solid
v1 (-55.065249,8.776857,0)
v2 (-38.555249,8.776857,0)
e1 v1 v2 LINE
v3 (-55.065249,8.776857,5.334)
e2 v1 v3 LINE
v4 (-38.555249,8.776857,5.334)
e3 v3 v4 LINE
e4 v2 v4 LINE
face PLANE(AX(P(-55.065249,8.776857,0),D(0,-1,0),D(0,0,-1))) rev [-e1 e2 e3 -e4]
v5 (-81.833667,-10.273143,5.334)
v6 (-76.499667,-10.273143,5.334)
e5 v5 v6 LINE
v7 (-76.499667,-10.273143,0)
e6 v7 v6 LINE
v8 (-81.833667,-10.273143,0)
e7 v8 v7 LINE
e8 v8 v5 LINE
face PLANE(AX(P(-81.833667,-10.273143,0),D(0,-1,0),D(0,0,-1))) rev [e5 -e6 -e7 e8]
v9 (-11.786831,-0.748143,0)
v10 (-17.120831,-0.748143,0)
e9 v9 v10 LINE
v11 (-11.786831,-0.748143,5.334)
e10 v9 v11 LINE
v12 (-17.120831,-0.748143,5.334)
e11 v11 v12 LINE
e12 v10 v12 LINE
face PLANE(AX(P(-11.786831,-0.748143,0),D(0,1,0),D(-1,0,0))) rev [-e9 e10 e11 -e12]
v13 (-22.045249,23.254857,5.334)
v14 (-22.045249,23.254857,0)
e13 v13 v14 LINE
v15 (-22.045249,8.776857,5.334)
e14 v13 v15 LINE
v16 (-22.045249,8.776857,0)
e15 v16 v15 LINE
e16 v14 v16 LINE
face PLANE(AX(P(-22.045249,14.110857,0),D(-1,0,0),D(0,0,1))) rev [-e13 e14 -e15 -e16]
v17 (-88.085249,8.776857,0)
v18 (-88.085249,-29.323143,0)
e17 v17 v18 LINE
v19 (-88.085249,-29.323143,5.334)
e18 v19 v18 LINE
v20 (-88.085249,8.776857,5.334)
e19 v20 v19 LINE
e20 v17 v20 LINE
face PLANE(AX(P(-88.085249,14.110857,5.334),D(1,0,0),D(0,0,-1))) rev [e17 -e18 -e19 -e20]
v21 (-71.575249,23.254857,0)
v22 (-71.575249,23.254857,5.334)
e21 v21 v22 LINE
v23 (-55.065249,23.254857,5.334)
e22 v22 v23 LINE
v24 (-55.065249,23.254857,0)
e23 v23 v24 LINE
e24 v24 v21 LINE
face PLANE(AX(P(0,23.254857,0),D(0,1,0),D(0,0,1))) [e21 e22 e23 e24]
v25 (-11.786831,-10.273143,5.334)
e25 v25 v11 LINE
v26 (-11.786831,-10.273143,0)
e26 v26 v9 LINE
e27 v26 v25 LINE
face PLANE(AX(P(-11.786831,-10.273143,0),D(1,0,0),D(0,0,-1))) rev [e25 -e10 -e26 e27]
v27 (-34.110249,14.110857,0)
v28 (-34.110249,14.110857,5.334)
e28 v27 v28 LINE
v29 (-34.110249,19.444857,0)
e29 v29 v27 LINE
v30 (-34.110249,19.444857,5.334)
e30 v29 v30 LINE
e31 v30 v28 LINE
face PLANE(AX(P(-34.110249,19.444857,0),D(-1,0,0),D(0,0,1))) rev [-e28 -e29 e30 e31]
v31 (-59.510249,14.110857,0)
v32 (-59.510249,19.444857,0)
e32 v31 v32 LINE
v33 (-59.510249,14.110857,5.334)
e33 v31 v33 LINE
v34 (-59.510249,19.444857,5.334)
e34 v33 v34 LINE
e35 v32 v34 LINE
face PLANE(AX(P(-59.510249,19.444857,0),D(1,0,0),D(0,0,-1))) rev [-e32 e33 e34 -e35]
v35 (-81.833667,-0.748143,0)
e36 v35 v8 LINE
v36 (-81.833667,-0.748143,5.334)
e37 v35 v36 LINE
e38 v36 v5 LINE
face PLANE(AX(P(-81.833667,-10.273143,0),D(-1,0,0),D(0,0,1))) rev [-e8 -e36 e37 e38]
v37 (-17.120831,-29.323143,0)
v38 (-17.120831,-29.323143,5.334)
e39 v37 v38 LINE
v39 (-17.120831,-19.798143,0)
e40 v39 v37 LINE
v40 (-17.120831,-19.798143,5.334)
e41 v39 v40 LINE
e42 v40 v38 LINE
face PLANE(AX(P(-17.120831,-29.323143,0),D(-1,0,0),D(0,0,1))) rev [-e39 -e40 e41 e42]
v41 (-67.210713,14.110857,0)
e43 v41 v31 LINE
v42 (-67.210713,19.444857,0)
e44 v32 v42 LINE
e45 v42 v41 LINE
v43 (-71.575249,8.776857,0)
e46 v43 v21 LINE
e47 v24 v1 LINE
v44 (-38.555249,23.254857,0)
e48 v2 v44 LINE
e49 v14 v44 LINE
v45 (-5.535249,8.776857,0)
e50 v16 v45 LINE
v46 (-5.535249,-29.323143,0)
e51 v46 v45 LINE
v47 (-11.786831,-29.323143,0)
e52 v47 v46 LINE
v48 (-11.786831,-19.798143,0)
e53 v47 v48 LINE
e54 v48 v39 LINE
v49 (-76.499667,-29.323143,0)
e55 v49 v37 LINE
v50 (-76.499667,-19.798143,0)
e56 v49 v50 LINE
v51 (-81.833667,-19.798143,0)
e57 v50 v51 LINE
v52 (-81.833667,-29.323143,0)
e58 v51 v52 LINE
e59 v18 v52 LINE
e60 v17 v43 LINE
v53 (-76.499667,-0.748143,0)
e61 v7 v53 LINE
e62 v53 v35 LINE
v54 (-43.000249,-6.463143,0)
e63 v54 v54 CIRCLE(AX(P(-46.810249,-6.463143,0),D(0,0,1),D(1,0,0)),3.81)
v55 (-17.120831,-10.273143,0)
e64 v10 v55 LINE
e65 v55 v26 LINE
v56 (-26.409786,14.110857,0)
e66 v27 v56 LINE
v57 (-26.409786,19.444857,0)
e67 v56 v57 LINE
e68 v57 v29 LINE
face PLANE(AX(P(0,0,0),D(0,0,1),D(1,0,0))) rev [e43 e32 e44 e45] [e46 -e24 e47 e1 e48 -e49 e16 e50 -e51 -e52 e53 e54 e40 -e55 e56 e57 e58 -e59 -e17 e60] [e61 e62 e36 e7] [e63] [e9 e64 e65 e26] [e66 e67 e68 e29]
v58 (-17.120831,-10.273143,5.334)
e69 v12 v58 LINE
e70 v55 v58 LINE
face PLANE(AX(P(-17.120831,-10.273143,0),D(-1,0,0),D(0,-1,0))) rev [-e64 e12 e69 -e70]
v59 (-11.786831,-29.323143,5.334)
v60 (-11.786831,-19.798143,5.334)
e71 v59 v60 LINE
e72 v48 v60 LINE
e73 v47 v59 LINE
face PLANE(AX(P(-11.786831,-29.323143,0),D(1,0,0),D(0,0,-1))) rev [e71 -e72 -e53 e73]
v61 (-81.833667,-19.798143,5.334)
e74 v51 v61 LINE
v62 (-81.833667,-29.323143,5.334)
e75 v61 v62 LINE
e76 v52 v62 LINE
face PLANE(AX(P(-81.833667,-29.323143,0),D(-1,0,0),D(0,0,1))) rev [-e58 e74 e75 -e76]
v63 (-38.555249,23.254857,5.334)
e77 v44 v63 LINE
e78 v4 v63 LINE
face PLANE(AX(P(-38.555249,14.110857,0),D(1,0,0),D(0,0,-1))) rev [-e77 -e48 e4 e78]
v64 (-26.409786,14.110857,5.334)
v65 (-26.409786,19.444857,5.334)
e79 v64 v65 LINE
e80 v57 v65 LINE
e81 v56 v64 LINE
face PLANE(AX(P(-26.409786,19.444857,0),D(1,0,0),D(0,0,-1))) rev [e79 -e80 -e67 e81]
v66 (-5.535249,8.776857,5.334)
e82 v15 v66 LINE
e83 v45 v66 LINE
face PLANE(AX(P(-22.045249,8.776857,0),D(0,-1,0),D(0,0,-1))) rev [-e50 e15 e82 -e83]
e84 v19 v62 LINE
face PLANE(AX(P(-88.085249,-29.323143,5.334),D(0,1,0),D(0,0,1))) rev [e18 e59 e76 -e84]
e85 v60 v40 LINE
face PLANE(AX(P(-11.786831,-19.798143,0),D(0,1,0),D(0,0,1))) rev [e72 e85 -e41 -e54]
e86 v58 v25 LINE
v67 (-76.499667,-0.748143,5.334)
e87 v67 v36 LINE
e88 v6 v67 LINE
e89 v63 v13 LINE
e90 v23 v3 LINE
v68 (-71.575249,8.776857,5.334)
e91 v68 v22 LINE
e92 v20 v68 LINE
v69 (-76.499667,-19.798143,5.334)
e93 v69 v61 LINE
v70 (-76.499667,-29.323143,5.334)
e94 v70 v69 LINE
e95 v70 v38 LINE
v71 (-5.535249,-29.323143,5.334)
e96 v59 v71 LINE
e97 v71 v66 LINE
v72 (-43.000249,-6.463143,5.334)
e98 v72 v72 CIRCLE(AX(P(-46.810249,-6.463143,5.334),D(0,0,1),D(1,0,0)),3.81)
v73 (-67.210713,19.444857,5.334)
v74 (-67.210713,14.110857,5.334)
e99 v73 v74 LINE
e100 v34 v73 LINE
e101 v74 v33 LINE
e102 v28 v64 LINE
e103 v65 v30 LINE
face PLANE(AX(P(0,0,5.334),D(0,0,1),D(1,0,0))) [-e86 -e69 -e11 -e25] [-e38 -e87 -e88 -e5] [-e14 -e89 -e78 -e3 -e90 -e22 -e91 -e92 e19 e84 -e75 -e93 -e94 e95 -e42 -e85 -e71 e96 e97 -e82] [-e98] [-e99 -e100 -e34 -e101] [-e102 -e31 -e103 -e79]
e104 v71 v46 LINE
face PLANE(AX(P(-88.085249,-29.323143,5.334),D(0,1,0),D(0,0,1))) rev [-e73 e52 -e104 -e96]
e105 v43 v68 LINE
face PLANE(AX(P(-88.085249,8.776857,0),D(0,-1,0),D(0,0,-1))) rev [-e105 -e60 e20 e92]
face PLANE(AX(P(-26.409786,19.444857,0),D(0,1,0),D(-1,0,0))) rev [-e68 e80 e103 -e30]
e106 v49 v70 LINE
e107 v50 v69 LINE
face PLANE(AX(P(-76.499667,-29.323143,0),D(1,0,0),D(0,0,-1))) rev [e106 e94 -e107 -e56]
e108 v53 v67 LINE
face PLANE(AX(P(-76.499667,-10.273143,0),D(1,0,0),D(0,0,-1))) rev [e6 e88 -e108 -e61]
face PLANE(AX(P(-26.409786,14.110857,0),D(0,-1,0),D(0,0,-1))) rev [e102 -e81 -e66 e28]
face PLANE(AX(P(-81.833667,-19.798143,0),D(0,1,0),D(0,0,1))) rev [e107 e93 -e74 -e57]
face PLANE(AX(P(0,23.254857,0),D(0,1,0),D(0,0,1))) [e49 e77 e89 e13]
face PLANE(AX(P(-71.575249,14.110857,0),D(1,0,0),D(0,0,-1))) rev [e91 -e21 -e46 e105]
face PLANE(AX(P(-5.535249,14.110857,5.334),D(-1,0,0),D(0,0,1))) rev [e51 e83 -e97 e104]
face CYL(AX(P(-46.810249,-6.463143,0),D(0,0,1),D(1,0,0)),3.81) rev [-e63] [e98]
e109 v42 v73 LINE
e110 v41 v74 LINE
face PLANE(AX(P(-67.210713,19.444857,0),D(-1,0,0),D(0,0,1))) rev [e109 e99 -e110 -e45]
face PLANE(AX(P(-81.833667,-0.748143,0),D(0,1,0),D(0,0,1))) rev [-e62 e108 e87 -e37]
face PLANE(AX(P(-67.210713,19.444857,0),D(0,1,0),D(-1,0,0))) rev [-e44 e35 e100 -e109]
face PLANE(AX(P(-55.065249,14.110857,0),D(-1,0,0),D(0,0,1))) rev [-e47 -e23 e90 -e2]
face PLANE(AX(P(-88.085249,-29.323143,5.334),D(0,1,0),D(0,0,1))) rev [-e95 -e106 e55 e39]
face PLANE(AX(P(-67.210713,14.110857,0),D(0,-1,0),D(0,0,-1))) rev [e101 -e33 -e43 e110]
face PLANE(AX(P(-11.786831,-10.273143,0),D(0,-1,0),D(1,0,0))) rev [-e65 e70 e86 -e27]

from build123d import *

# Parameters (mm, degrees)
SKETCH1_W                = 82.55
SKETCH1_H                = 43.434
BOSS_EXTRUDE1_DEPTH      = 5.334
CUT_EXTRUDE1_START       = -88.085249325
CUT_EXTRUDE1_OUTLINE_W   = 5.334
CUT_EXTRUDE1_OUTLINE_H   = 5.334
CUT_EXTRUDE1_DEPTH       = 16.51
CUT_EXTRUDE1_START_2     = -55.065249325
CUT_EXTRUDE1_2_OUTLINE_W = 5.334
CUT_EXTRUDE1_2_OUTLINE_H = 5.334
CUT_EXTRUDE1_2_DEPTH     = 16.51
CUT_EXTRUDE1_START_3     = -22.045249325
CUT_EXTRUDE1_3_OUTLINE_W = 5.334
CUT_EXTRUDE1_3_OUTLINE_H = 5.334
CUT_EXTRUDE1_3_DEPTH     = 16.51
SKETCH3_W                = 5.334
SKETCH3_H                = 9.525
CUT_EXTRUDE2_DEPTH       = 93.990910348
SKETCH4_R                = 3.81
CUT_EXTRUDE3_DEPTH       = 93.990910348
SKETCH5_W                = 16.51
SKETCH5_H                = 5.334
BOSS_EXTRUDE2_DEPTH      = 9.144
SKETCH6_W                = 7.700463705
SKETCH6_H                = 5.334
SKETCH6_W_2              = 7.700463706
CUT_EXTRUDE4_DEPTH       = 93.990910348


# Read off the part's stored shape, not the designer's step: Cut-Extrude1
with BuildPart() as part:
    # Sketch1 → Boss-Extrude1 (new body)
    with BuildSketch(Plane.XY):
        with Locations((-46.810249325, -7.606142782)):
            Rectangle(SKETCH1_W, SKETCH1_H)
    extrude(amount=BOSS_EXTRUDE1_DEPTH)

    # Cut-Extrude1 outline → Cut-Extrude1 (cut)
    with BuildSketch(Plane.YZ.offset(CUT_EXTRUDE1_START)):
        with Locations((11.443857218, 2.667)):
            Rectangle(CUT_EXTRUDE1_OUTLINE_W, CUT_EXTRUDE1_OUTLINE_H)
    extrude(amount=CUT_EXTRUDE1_DEPTH, mode=Mode.SUBTRACT)

    # Cut-Extrude1 2 outline → Cut-Extrude1 2 (cut)
    with BuildSketch(Plane.YZ.offset(CUT_EXTRUDE1_START_2)):
        with Locations((11.443857218, 2.667)):
            Rectangle(CUT_EXTRUDE1_2_OUTLINE_W, CUT_EXTRUDE1_2_OUTLINE_H)
    extrude(amount=CUT_EXTRUDE1_2_DEPTH, mode=Mode.SUBTRACT)

    # Cut-Extrude1 3 outline → Cut-Extrude1 3 (cut)
    with BuildSketch(Plane.YZ.offset(CUT_EXTRUDE1_START_3)):
        with Locations((11.443857218, 2.667)):
            Rectangle(CUT_EXTRUDE1_3_OUTLINE_W, CUT_EXTRUDE1_3_OUTLINE_H)
    extrude(amount=CUT_EXTRUDE1_3_DEPTH, mode=Mode.SUBTRACT)

    # Sketch3 → Cut-Extrude2 (cut, through all)
    with BuildSketch(Plane.XY.offset(5.334)):
        with Locations((-79.166667411, -24.560642782)):
            Rectangle(SKETCH3_W, SKETCH3_H)
        with Locations((-79.166667411, -5.510642782)):
            Rectangle(SKETCH3_W, SKETCH3_H)
        with Locations((-14.453831238, -5.510642782)):
            Rectangle(SKETCH3_W, SKETCH3_H)
        with Locations((-14.453831238, -24.560642782)):
            Rectangle(SKETCH3_W, SKETCH3_H)
    extrude(amount=-CUT_EXTRUDE2_DEPTH, mode=Mode.SUBTRACT)

    # Sketch4 → Cut-Extrude3 (cut, through all)
    with BuildSketch(Plane.XY.offset(5.334)):
        with Locations((-46.810249325, -6.463142782)):
            Circle(SKETCH4_R)
    extrude(amount=-CUT_EXTRUDE3_DEPTH, mode=Mode.SUBTRACT)

    # Sketch5 → Boss-Extrude2 (add)
    with BuildSketch(Plane(origin=(0, 14.110857218, 0), x_dir=(1, 0, 0), z_dir=(0, 1, 0))):
        with Locations((-63.320249325, -2.667)):
            Rectangle(SKETCH5_W, SKETCH5_H)
        with Locations((-30.300249325, -2.667)):
            Rectangle(SKETCH5_W, SKETCH5_H)
    extrude(amount=BOSS_EXTRUDE2_DEPTH)

    # Sketch6 → Cut-Extrude4 (cut, through all)
    with BuildSketch(Plane.XY.offset(5.334)):
        with Locations((-63.360481178, 16.777857218)):
            Rectangle(SKETCH6_W, SKETCH6_H)
        with Locations((-30.260017472, 16.777857218)):
            Rectangle(SKETCH6_W_2, SKETCH6_H)
    extrude(amount=-CUT_EXTRUDE4_DEPTH, mode=Mode.SUBTRACT)


solid = part.part
